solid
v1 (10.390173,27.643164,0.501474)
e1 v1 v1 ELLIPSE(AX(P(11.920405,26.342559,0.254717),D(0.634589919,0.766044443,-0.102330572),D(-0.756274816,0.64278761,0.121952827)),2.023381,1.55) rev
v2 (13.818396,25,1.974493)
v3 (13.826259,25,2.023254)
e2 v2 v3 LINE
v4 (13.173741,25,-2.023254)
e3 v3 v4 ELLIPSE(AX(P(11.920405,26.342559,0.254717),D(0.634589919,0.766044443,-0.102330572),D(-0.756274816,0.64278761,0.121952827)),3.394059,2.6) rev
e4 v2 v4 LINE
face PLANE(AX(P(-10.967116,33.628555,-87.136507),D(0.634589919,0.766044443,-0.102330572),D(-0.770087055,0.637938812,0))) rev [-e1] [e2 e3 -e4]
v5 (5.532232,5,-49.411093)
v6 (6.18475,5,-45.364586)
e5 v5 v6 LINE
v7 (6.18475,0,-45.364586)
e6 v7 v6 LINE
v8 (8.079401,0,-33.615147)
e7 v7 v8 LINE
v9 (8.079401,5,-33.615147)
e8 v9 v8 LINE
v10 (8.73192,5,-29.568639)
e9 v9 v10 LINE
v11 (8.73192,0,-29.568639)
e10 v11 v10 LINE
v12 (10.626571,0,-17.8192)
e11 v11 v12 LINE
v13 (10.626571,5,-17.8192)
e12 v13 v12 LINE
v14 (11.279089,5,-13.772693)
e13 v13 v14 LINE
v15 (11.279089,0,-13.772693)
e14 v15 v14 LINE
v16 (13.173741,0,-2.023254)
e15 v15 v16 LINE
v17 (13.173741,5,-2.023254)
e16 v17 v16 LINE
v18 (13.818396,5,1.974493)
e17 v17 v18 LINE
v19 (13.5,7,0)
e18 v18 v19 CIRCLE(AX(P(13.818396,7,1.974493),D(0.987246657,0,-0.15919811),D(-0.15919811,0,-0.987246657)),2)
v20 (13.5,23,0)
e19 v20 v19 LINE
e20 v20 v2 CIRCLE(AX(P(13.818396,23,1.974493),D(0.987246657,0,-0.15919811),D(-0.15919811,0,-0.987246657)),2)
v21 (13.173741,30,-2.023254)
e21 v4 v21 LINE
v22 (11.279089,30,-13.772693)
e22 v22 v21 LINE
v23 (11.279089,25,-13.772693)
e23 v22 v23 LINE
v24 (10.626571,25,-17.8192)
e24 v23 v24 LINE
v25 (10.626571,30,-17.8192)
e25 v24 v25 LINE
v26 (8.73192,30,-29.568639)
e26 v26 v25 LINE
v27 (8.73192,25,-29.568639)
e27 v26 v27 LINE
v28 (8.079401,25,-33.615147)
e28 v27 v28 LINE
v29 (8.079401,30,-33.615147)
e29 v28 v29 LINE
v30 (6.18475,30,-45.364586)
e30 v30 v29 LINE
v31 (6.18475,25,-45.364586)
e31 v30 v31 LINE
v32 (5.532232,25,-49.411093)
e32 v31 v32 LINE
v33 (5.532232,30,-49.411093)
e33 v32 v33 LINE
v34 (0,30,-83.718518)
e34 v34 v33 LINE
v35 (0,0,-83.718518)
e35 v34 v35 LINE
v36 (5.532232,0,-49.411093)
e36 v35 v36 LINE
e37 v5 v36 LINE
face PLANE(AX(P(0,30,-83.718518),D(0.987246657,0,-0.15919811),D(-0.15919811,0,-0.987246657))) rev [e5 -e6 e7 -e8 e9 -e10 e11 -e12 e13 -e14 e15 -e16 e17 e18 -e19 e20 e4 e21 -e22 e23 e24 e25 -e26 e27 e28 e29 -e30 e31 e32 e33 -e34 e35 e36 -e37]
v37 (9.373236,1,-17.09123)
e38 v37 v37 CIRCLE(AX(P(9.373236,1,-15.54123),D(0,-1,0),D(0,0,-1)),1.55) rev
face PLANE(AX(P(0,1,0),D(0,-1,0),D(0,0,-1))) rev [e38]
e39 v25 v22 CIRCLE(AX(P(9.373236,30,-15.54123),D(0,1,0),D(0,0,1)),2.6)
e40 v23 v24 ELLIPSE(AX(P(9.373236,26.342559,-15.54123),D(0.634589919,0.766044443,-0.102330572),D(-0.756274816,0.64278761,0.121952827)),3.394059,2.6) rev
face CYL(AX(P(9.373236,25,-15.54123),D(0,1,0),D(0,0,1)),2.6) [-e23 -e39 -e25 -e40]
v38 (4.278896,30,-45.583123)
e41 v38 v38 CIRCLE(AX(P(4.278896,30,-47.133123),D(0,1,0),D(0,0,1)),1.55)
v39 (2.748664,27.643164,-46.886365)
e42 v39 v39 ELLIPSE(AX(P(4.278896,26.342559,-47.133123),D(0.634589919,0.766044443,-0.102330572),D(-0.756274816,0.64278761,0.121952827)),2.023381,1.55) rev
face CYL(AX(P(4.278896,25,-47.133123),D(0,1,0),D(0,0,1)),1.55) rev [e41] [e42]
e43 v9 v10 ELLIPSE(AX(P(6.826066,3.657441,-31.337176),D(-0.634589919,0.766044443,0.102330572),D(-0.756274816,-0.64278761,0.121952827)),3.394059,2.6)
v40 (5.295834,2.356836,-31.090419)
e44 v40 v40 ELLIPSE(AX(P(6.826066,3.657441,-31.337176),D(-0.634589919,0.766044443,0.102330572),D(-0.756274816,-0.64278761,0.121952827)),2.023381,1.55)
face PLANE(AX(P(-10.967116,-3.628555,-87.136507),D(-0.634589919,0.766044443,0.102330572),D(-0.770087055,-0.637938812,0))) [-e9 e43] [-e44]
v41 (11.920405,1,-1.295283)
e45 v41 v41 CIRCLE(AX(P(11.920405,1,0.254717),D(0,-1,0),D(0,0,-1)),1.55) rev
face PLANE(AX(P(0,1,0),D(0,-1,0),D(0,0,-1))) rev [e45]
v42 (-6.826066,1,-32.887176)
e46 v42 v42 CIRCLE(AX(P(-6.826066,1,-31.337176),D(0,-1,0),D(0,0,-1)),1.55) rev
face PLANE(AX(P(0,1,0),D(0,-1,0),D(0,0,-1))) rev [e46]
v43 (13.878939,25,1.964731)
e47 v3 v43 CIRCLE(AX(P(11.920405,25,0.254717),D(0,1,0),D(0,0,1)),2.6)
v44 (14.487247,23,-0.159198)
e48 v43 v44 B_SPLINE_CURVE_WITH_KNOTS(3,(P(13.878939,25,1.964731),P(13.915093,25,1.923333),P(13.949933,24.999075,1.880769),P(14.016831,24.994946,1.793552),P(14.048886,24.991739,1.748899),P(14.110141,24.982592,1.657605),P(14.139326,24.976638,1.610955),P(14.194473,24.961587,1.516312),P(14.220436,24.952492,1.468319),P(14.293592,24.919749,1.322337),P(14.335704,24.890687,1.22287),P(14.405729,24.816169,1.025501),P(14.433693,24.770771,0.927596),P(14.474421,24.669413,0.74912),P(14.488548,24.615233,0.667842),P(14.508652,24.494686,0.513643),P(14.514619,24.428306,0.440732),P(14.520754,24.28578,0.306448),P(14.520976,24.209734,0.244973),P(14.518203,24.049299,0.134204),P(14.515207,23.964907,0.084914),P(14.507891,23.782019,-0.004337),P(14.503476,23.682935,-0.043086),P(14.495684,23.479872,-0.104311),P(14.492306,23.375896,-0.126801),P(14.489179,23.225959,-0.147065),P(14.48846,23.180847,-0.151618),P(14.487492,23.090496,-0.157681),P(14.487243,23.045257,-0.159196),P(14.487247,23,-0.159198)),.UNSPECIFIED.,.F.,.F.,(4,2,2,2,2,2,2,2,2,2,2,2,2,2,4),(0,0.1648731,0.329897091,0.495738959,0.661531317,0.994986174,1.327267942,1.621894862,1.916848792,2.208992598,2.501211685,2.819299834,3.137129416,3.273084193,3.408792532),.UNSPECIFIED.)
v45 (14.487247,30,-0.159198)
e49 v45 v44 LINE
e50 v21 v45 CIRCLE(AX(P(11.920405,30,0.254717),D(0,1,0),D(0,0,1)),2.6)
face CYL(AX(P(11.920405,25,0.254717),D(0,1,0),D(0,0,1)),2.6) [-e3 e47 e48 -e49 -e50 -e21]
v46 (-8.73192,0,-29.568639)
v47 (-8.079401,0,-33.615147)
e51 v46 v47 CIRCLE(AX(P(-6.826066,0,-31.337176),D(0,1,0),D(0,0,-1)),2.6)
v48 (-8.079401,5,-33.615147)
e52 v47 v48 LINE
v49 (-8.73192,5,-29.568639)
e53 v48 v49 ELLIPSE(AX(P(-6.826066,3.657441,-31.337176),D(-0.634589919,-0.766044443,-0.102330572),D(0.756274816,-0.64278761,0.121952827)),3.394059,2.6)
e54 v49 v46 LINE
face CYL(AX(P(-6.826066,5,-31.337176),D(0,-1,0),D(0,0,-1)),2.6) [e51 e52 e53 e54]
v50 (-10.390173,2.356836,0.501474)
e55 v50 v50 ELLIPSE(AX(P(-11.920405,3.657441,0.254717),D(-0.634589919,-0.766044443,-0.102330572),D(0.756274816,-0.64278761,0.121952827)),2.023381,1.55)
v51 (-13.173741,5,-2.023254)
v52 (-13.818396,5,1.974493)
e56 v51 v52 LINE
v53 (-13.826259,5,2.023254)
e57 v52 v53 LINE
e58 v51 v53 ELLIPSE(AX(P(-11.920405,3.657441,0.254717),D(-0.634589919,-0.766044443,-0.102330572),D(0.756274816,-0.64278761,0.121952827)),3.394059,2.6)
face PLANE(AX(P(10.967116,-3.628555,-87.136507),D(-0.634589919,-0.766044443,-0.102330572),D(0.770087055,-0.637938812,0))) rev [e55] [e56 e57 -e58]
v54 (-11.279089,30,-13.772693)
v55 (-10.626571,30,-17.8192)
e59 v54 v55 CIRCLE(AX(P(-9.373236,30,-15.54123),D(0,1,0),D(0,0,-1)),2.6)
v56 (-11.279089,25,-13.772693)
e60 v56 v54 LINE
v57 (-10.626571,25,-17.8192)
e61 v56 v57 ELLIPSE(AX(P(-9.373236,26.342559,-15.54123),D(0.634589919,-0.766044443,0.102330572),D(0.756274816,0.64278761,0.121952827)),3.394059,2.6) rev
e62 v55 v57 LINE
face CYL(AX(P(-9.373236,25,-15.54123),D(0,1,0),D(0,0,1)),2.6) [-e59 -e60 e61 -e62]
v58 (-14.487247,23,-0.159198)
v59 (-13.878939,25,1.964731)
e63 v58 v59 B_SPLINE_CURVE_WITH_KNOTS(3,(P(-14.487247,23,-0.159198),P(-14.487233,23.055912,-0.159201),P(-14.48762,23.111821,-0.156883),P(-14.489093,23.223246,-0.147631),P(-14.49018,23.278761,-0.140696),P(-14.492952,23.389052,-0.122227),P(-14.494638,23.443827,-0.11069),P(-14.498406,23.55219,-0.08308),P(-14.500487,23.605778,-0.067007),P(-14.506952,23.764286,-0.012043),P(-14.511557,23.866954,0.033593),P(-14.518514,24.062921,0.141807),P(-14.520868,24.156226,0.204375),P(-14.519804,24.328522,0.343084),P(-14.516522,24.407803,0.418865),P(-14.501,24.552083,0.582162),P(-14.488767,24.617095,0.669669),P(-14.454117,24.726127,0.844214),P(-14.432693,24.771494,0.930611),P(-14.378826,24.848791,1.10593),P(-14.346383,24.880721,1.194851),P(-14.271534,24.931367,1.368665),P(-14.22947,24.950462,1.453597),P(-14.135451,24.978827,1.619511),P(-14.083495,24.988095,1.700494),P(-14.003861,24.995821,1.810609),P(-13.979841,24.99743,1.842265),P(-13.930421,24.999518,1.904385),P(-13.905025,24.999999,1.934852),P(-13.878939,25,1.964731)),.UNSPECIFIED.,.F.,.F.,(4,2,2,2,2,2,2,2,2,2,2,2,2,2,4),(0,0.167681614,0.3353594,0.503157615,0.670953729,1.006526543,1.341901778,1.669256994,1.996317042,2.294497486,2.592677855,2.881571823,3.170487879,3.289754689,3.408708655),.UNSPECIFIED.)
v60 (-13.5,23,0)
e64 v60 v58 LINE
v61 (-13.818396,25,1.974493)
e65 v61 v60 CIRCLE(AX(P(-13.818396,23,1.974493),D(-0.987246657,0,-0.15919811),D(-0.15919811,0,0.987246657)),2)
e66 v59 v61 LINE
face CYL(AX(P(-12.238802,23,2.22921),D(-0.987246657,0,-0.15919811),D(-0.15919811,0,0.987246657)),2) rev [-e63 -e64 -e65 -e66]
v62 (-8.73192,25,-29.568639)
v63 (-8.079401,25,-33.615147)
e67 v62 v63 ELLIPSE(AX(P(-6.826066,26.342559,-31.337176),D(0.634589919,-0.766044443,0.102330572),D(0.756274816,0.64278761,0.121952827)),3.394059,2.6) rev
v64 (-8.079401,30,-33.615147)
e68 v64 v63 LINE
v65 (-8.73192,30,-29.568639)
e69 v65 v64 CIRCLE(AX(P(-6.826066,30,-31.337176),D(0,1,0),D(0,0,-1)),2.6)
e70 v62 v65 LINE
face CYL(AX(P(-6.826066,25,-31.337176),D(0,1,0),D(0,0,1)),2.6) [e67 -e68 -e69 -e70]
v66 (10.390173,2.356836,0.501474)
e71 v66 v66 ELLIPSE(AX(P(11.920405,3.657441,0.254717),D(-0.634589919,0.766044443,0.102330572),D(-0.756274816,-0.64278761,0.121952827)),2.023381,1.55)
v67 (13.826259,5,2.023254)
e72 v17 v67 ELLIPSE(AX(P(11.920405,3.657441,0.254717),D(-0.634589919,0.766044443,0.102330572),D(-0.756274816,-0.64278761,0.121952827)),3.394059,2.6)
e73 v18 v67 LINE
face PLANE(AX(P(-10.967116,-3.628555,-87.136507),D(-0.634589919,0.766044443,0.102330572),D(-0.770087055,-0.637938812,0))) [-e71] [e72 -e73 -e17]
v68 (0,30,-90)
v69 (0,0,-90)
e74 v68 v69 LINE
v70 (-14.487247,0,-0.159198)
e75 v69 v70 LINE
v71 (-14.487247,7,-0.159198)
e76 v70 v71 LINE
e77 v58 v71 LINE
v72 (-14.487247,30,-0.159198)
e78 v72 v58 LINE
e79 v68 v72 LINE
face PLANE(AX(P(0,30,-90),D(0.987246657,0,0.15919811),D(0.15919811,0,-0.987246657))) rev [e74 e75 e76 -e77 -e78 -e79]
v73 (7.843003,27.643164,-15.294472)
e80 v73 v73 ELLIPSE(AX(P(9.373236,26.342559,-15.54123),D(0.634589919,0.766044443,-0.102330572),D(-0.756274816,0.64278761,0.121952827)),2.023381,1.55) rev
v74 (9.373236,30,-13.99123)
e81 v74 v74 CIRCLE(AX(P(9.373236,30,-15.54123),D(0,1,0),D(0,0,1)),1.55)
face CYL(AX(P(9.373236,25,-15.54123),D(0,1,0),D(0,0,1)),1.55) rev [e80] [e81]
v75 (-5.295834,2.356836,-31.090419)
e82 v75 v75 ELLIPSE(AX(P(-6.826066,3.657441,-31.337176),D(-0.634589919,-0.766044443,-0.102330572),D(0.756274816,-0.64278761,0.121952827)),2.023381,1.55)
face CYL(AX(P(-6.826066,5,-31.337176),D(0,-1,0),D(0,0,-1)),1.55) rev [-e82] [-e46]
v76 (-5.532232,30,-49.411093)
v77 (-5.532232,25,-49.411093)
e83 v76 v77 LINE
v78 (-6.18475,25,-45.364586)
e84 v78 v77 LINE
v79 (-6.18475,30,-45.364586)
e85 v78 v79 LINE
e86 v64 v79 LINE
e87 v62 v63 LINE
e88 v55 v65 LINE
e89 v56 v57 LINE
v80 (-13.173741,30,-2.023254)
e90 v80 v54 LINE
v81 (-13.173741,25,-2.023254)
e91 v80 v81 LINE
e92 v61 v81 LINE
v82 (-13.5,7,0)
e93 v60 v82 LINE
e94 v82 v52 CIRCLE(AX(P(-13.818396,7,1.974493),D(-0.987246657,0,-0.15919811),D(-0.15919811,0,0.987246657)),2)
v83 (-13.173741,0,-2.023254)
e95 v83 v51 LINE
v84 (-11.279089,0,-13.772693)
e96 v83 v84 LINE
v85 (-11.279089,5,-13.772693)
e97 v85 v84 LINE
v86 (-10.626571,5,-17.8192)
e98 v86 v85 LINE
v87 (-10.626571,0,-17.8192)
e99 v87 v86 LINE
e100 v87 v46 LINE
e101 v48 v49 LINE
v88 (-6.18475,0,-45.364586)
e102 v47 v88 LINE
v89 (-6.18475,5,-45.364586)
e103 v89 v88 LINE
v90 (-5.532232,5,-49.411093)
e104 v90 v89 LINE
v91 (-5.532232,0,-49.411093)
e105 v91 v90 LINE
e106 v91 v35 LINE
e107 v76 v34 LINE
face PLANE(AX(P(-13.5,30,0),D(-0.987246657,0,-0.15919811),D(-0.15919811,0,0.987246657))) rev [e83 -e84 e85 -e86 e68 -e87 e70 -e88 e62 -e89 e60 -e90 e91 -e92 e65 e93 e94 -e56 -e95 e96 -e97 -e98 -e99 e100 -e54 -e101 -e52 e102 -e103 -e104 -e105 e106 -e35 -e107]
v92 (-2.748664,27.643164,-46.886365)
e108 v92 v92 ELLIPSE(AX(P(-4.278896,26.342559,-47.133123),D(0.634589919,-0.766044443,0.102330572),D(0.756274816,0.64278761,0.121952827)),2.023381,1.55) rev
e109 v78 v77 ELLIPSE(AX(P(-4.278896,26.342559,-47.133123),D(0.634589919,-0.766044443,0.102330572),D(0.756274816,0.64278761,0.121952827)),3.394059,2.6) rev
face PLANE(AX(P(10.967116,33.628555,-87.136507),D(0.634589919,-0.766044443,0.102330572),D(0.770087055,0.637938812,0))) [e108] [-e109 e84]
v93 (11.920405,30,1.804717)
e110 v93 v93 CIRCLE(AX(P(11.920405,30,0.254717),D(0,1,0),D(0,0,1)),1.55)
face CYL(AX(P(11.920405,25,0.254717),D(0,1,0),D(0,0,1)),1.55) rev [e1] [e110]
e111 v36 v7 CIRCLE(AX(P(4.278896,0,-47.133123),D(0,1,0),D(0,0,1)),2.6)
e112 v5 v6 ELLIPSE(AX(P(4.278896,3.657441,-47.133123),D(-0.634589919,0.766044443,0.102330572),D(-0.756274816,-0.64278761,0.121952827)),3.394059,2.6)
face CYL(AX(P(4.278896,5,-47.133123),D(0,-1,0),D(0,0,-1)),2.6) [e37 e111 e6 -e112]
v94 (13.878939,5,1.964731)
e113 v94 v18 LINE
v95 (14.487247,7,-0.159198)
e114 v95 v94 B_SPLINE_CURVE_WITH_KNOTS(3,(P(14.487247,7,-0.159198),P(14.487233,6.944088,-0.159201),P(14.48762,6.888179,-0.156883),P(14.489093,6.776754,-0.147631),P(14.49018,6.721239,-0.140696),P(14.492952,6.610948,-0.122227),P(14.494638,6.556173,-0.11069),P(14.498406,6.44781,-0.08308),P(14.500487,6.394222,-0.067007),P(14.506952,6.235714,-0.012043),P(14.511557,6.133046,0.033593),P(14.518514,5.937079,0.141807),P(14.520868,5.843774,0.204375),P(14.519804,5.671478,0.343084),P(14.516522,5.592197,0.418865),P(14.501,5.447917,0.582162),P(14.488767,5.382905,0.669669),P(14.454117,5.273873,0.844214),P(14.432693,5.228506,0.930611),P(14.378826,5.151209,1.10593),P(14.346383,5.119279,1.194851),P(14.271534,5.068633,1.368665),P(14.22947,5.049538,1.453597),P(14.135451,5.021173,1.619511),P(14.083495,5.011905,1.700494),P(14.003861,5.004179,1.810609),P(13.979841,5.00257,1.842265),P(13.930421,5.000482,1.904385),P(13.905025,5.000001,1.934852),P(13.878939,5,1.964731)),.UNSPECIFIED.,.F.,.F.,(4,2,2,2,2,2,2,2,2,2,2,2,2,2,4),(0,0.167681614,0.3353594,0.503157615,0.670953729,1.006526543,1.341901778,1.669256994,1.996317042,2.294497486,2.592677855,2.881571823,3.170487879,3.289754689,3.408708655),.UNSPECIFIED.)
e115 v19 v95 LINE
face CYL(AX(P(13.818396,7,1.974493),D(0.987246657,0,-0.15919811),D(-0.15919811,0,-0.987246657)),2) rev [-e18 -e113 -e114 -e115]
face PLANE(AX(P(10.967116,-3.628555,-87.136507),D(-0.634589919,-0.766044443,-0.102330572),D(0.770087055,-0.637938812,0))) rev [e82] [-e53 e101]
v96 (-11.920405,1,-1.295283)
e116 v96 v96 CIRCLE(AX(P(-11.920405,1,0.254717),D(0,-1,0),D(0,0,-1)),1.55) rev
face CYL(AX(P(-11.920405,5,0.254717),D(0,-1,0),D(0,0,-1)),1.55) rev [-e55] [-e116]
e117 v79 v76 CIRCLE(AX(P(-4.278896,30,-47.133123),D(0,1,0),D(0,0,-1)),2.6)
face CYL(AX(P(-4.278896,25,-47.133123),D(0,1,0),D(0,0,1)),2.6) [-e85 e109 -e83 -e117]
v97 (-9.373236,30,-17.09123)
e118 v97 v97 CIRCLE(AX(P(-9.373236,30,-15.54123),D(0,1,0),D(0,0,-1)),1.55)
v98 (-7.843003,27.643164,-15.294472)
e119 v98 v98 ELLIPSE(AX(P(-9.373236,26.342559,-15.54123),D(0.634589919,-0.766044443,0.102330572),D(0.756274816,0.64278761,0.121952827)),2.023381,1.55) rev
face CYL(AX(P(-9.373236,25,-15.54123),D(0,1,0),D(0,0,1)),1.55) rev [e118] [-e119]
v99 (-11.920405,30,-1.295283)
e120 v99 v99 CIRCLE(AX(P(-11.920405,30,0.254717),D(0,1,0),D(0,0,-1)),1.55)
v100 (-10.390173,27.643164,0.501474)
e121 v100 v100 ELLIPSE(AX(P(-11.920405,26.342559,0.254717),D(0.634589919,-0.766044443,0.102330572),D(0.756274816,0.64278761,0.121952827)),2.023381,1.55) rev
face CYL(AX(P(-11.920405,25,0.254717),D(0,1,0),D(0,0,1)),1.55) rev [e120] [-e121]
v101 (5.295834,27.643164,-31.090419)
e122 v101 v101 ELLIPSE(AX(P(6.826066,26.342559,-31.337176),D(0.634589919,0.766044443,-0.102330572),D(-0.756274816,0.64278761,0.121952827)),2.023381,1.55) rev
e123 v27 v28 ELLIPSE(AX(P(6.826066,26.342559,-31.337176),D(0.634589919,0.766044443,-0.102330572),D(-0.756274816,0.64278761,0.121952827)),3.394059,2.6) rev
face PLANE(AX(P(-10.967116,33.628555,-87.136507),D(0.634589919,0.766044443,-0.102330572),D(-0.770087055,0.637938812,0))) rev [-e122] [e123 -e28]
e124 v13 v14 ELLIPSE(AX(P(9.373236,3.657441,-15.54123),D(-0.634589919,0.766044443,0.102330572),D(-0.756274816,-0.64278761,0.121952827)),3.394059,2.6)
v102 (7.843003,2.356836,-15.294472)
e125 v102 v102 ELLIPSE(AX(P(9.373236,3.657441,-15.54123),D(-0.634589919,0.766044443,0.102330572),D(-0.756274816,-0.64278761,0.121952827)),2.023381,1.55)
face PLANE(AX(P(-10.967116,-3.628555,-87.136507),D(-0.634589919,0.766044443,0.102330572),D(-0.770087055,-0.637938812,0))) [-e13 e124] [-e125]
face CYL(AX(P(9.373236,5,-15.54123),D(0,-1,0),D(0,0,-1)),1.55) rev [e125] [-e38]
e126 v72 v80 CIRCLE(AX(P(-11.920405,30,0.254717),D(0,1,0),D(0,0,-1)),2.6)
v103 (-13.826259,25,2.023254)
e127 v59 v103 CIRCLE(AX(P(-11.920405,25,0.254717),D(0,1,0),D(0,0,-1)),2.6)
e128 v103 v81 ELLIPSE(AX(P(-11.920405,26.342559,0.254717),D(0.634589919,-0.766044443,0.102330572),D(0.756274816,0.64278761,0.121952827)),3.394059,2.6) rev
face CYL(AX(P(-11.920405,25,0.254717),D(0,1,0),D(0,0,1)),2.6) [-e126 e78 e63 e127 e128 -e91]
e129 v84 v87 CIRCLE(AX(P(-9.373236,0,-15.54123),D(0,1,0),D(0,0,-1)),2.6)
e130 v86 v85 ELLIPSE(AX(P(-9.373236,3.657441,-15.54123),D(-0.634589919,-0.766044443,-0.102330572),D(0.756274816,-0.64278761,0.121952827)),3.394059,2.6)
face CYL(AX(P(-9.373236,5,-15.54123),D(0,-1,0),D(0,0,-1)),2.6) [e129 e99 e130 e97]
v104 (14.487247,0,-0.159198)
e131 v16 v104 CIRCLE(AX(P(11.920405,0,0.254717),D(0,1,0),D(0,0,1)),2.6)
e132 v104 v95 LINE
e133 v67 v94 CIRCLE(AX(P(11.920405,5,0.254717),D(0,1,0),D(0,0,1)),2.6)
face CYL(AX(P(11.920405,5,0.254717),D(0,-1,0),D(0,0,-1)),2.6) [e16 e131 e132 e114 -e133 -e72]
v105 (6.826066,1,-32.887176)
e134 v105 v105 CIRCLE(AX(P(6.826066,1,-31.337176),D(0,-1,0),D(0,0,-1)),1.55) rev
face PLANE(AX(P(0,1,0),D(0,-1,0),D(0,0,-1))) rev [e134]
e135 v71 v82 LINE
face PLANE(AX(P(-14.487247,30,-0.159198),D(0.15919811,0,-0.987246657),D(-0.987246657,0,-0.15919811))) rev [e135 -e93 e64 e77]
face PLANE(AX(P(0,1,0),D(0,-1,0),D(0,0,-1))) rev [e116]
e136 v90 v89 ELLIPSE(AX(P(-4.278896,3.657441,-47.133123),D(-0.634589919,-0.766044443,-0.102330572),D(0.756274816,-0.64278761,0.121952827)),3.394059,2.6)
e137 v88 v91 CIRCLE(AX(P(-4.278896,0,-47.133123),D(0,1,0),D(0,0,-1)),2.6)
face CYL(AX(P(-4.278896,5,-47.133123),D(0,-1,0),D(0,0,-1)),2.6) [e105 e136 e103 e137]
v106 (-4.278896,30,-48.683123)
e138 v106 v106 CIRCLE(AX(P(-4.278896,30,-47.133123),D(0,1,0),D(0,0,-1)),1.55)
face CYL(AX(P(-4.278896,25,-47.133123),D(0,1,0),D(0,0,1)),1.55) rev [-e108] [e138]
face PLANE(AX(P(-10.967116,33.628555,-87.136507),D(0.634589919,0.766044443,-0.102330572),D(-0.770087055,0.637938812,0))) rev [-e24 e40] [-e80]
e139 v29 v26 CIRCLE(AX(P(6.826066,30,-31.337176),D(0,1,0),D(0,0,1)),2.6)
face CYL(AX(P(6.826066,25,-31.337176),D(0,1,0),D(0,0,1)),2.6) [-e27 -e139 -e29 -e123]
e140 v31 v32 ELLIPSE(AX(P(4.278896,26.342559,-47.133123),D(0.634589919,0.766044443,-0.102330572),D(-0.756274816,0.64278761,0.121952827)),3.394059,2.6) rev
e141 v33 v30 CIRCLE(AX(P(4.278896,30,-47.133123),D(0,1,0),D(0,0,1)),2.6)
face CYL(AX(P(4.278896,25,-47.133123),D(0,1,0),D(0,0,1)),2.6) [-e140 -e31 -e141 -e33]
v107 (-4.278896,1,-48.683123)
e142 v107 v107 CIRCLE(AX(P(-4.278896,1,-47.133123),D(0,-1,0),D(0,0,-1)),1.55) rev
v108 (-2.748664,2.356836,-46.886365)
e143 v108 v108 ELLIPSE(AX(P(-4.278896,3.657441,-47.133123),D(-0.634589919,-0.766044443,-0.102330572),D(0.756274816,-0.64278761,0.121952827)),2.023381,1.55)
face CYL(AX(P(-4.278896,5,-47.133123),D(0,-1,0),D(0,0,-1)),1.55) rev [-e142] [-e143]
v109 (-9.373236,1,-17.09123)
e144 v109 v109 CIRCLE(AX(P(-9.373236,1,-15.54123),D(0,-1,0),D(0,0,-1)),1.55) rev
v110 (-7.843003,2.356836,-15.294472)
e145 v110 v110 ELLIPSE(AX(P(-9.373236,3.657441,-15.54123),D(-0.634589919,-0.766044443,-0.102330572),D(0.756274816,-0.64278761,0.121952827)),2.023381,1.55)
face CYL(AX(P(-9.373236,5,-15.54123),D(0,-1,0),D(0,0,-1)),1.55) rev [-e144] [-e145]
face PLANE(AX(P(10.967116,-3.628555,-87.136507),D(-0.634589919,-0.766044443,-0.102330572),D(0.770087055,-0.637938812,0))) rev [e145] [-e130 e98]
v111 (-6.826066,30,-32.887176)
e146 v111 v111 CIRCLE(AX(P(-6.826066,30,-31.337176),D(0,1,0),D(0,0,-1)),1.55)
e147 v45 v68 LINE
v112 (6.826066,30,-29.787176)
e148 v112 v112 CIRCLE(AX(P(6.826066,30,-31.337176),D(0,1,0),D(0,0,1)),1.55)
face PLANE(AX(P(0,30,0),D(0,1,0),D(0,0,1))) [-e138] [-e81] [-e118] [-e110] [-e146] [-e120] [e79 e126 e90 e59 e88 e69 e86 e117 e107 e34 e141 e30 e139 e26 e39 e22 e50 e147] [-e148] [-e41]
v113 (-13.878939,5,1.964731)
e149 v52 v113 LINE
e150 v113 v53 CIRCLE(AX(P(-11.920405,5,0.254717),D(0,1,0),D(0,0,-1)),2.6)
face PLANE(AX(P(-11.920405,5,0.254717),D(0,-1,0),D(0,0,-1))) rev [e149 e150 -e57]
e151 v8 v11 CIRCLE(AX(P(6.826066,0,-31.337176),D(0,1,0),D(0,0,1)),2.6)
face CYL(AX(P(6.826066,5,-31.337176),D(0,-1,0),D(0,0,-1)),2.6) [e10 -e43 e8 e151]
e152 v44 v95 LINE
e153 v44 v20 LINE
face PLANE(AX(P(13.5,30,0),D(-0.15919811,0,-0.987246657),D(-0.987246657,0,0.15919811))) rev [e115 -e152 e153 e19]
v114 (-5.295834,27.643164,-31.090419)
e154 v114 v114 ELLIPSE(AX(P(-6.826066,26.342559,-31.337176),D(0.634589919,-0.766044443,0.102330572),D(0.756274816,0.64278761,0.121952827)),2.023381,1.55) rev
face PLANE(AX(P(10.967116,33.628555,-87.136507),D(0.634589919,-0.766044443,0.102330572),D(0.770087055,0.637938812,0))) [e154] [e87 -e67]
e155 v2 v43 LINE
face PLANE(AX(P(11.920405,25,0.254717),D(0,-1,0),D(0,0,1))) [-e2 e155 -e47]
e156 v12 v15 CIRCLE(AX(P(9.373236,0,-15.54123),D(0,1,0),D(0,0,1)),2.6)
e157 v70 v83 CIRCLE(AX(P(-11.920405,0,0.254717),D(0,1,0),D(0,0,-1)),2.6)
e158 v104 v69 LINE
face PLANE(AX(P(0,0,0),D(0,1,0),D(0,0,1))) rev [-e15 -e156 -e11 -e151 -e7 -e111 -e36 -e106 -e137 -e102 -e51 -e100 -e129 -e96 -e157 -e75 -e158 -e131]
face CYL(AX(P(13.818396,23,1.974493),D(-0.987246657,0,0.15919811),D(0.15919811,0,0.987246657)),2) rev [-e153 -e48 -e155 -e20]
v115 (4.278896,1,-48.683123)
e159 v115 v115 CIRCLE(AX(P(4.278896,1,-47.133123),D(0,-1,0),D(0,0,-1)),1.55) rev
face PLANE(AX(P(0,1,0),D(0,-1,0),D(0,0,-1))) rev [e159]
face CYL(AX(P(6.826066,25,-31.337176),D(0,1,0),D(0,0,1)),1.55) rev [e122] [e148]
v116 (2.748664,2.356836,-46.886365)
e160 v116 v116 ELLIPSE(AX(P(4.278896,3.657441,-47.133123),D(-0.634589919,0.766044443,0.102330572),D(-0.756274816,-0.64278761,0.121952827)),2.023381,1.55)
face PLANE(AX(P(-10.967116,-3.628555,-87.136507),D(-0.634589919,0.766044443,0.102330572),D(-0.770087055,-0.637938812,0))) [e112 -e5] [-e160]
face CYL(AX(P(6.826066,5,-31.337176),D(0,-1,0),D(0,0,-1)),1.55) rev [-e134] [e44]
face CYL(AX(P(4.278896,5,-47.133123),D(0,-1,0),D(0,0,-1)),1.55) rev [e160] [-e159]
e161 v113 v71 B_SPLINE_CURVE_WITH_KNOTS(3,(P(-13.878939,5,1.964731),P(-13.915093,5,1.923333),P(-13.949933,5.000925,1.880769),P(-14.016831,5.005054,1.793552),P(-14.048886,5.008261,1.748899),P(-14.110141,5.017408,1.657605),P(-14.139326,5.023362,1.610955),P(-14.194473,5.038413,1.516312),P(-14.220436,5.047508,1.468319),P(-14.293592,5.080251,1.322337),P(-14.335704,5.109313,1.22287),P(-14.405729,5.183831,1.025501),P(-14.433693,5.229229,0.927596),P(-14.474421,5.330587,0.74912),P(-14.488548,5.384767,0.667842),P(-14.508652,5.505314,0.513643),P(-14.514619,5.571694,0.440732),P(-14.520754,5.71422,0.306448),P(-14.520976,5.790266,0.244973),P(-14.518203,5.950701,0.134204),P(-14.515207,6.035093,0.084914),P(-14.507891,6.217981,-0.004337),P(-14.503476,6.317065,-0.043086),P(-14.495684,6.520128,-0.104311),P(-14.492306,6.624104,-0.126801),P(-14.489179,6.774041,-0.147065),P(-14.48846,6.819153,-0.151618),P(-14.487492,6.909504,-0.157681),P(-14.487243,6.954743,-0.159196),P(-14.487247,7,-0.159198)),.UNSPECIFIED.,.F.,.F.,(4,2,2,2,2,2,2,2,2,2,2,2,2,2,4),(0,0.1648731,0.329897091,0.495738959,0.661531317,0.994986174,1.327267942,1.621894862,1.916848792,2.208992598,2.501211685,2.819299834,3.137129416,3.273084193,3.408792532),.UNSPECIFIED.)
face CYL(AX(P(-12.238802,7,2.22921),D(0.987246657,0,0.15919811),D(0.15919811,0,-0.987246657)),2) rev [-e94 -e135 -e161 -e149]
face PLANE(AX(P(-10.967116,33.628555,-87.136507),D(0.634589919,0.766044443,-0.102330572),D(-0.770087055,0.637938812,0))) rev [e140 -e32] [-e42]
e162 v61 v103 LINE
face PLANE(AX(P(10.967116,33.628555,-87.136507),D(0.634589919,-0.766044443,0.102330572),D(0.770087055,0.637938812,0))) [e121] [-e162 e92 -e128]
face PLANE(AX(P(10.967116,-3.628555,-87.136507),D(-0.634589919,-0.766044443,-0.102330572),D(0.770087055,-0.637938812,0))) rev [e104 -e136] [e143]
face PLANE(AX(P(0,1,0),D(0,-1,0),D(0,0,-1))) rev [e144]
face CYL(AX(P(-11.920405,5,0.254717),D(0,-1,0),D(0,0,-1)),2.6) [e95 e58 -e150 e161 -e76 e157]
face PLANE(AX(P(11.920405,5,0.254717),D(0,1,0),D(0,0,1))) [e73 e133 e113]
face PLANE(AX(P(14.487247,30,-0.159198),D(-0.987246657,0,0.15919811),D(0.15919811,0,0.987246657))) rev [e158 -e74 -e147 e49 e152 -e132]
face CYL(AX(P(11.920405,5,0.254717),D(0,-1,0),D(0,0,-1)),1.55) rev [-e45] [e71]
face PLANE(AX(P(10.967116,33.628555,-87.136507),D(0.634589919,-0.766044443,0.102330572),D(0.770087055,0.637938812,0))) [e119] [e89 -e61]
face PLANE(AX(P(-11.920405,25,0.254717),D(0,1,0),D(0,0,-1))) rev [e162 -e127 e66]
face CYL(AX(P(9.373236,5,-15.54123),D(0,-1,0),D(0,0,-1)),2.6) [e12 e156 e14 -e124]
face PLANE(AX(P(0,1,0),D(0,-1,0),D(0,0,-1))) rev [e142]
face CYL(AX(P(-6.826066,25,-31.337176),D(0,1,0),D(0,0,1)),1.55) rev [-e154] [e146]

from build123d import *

# Parameters (mm, degrees)
BOSS_EXTRUDE1_DEPTH            = 30
SKETCH2_R                      = 2.6
SKETCH2_R_2                    = 1.55
BOSS_EXTRUDE3_DEPTH            = 5
CUT_EXTRUDE1_REACH             = 100.017
CUT_EXTRUDE1_DIRECTION_2_DEPTH = 99.016911981
CUT_EXTRUDE2_REACH             = 100.017
CUT_EXTRUDE2_DIRECTION_2_DEPTH = 99.016911981
FILLET1_R                      = 2
SKETCH6_R                      = 2.6
BOSS_EXTRUDE4_DEPTH            = 1


with BuildPart() as part:
    # Sketch1 → Boss-Extrude1 (new body)
    with BuildSketch(Plane(origin=(0, 0, 0), x_dir=(1, 0, 0), z_dir=(0, 1, 0))):
        Polygon((-13.5, 0), (0, 83.718518379), (13.5, 0), (14.487246657, 0.15919811), (0, 90), (-14.487246657, 0.15919811), align=None)
    extrude(amount=BOSS_EXTRUDE1_DEPTH)

    # Sketch2 → Boss-Extrude3 (add)
    # profile 1 of 8: a face of its own
    with BuildSketch(Plane(origin=(0, 0, 0), x_dir=(1, 0, 0), z_dir=(0, 1, 0))):
        with Locations((11.920405349, -0.254716975)):
            Circle(SKETCH2_R)
        with Locations(Location((11.920405349, -0.254716975, 0), (0, 0, 270))):
            Circle(SKETCH2_R_2, mode=Mode.SUBTRACT)
    # profile 2 of 8: a face of its own
    with BuildSketch(Plane(origin=(0, 0, 0), x_dir=(1, 0, 0), z_dir=(0, 1, 0))):
        with Locations((9.373235594, 15.541229537)):
            Circle(SKETCH2_R)
        with Locations(Location((9.373235594, 15.541229537, 0), (0, 0, 270))):
            Circle(SKETCH2_R_2, mode=Mode.SUBTRACT)
    # profile 3 of 8: a face of its own
    with BuildSketch(Plane(origin=(0, 0, 0), x_dir=(1, 0, 0), z_dir=(0, 1, 0))):
        with Locations((6.826065839, 31.33717605)):
            Circle(SKETCH2_R)
        with Locations(Location((6.826065839, 31.33717605, 0), (0, 0, 270))):
            Circle(SKETCH2_R_2, mode=Mode.SUBTRACT)
    # profile 4 of 8: a face of its own
    with BuildSketch(Plane(origin=(0, 0, 0), x_dir=(1, 0, 0), z_dir=(0, 1, 0))):
        with Locations((4.278896085, 47.133122563)):
            Circle(SKETCH2_R)
        with Locations(Location((4.278896085, 47.133122563, 0), (0, 0, 270))):
            Circle(SKETCH2_R_2, mode=Mode.SUBTRACT)
    # profile 5 of 8: a face of its own
    with BuildSketch(Plane(origin=(0, 0, 0), x_dir=(1, 0, 0), z_dir=(0, 1, 0))):
        with Locations((-4.278896085, 47.133122563)):
            Circle(SKETCH2_R)
        with Locations(Location((-4.278896085, 47.133122563, 0), (0, 0, 90))):
            Circle(SKETCH2_R_2, mode=Mode.SUBTRACT)
    # profile 6 of 8: a face of its own
    with BuildSketch(Plane(origin=(0, 0, 0), x_dir=(1, 0, 0), z_dir=(0, 1, 0))):
        with Locations((-6.826065839, 31.33717605)):
            Circle(SKETCH2_R)
        with Locations(Location((-6.826065839, 31.33717605, 0), (0, 0, 90))):
            Circle(SKETCH2_R_2, mode=Mode.SUBTRACT)
    # profile 7 of 8: a face of its own
    with BuildSketch(Plane(origin=(0, 0, 0), x_dir=(1, 0, 0), z_dir=(0, 1, 0))):
        with Locations((-9.373235594, 15.541229537)):
            Circle(SKETCH2_R)
        with Locations(Location((-9.373235594, 15.541229537, 0), (0, 0, 90))):
            Circle(SKETCH2_R_2, mode=Mode.SUBTRACT)
    # profile 8 of 8: a face of its own
    with BuildSketch(Plane(origin=(0, 0, 0), x_dir=(1, 0, 0), z_dir=(0, 1, 0))):
        with Locations((-11.920405349, -0.254716975)):
            Circle(SKETCH2_R)
        with Locations(Location((-11.920405349, -0.254716975, 0), (0, 0, 90))):
            Circle(SKETCH2_R_2, mode=Mode.SUBTRACT)
    boss_extrude3 = extrude(amount=BOSS_EXTRUDE3_DEPTH)

    # Cut-Extrude1: up to this face of the body (flat: up to its plane)
    cut_extrude1_end = Plane(part.part.faces().sort_by_distance((-6.68152525, 15.362665762, -42.28389657))[0])
    # Sketch4 → Cut-Extrude1 (cut, up to the picked face)
    with BuildSketch(Plane(origin=(0.342144515, 0, 2.121765321), x_dir=(0.9872466570606503, 0, -0.1591981096702188), z_dir=(0.1591981096702188, 0, 0.9872466570606503)), mode=Mode.PRIVATE) as cut_extrude1_sk1:
        Polygon((13.32782987, 5), (9.12782987, 5), (9.12782987, 1.475781549), align=None)
    cut_extrude1_tool1 = split(extrude(cut_extrude1_sk1.sketch, amount=-CUT_EXTRUDE1_REACH, mode=Mode.PRIVATE), bisect_by=cut_extrude1_end, keep=Keep.BOTH, mode=Mode.PRIVATE)
    cut_extrude1 = cut_extrude1_tool1.solids().sort_by(Axis((10.735709, 3.825261, 0.445755), (-0.1591981096702188, 0, -0.9872466570606503)))[0]
    add(cut_extrude1, mode=Mode.SUBTRACT)

    # Sketch4 → Cut-Extrude1 direction 2 (cut)
    with BuildSketch(Plane(origin=(0.342144515, 0, 2.121765321), x_dir=(0.9872466570606503, 0, -0.1591981096702188), z_dir=(0.1591981096702188, 0, 0.9872466570606503))):
        Polygon((13.32782987, 5), (9.12782987, 5), (9.12782987, 1.475781549), align=None)
    cut_extrude1_direction_2 = extrude(amount=CUT_EXTRUDE1_DIRECTION_2_DEPTH, mode=Mode.SUBTRACT)

    # Cut-Extrude2: up to this face of the body (flat: up to its plane)
    cut_extrude2_end = Plane(part.part.faces().sort_by_distance((6.68152525, 15.362665762, -42.28389657))[0])
    # Sketch5 → Cut-Extrude2 (cut, up to the picked face)
    with BuildSketch(Plane(origin=(-0.342144515, 0, 2.121765321), x_dir=(0.9872466570606502, 0, 0.15919810967021986), z_dir=(-0.15919810967021986, 0, 0.9872466570606502)), mode=Mode.PRIVATE) as cut_extrude2_sk1:
        Polygon((-9.12782987, 5), (-9.12782987, 1.475781549), (-13.32782987, 5), align=None)
    cut_extrude2_tool1 = split(extrude(cut_extrude2_sk1.sketch, amount=-CUT_EXTRUDE2_REACH, mode=Mode.PRIVATE), bisect_by=cut_extrude2_end, keep=Keep.BOTH, mode=Mode.PRIVATE)
    cut_extrude2 = cut_extrude2_tool1.solids().sort_by(Axis((-10.735709, 3.825261, 0.445755), (0.15919810967021986, 0, -0.9872466570606502)))[0]
    add(cut_extrude2, mode=Mode.SUBTRACT)

    # Sketch5 → Cut-Extrude2 direction 2 (cut)
    with BuildSketch(Plane(origin=(-0.342144515, 0, 2.121765321), x_dir=(0.9872466570606502, 0, 0.15919810967021986), z_dir=(-0.15919810967021986, 0, 0.9872466570606502))):
        Polygon((-9.12782987, 5), (-9.12782987, 1.475781549), (-13.32782987, 5), align=None)
    cut_extrude2_direction_2 = extrude(amount=CUT_EXTRUDE2_DIRECTION_2_DEPTH, mode=Mode.SUBTRACT)

    # Mirror2: Boss-Extrude3, Cut-Extrude1, Cut-Extrude1 direction 2, Cut-Extrude2, Cut-Extrude2 direction 2 across plane
    add(boss_extrude3.mirror(Plane.ZX.offset(15)))
    add(cut_extrude1.mirror(Plane.ZX.offset(15)), mode=Mode.SUBTRACT)
    add(cut_extrude1_direction_2.mirror(Plane.ZX.offset(15)), mode=Mode.SUBTRACT)
    add(cut_extrude2.mirror(Plane.ZX.offset(15)), mode=Mode.SUBTRACT)
    add(cut_extrude2_direction_2.mirror(Plane.ZX.offset(15)), mode=Mode.SUBTRACT)

    # Fillet1
    # the kernel refuses this fillet: 2 mm, written as the material it adds along each edge
    with BuildSketch(Plane(origin=(-19.423479942, 5, -0.955188658), x_dir=(-0.15919810967021975, 0, 0.9872466570606501), z_dir=(0.9872466570606501, 0, 0.15919810967021975))) as fillet1_piece_1_section:
        with BuildLine():
            CenterArc((FILLET1_R, -FILLET1_R), FILLET1_R, 90, 90)
            Line((0, -FILLET1_R), (0, 0))
            Line((0, 0), (FILLET1_R, 0))
        make_face()
    fillet1_piece_1 = extrude(amount=6, mode=Mode.PRIVATE)
    fillet1_piece_1 = fillet1_piece_1 & Plane(origin=(-11.920405349, 5.222362792, 0.254716975), x_dir=(1, 0, 0), z_dir=(0, -1, 0)) * Cylinder(2.6, 21, mode=Mode.PRIVATE)
    add(fillet1_piece_1)
    with BuildSketch(Plane(origin=(13.5, 5, 0), x_dir=(0, 1, 0), z_dir=(0.9872466570606502, 0, -0.15919810967021866))) as fillet1_piece_2_section:
        with BuildLine():
            CenterArc((FILLET1_R, FILLET1_R), FILLET1_R, 180, 90)
            Line((0, FILLET1_R), (0, 0))
            Line((0, 0), (FILLET1_R, 0))
        make_face()
    fillet1_piece_2 = extrude(amount=6, mode=Mode.PRIVATE)
    fillet1_piece_2 = fillet1_piece_2 & Plane(origin=(11.920405349, 5.699977741, 0.254716975), x_dir=(1, 0, 0), z_dir=(0, -1, 0)) * Cylinder(2.6, 20, mode=Mode.PRIVATE)
    add(fillet1_piece_2)
    with BuildSketch(Plane(origin=(13.5, 25, 0), x_dir=(0, -1, 0), z_dir=(0.9872466570606502, 0, -0.15919810967021866))) as fillet1_piece_3_section:
        with BuildLine():
            CenterArc((FILLET1_R, -FILLET1_R), FILLET1_R, 90, 90)
            Line((0, -FILLET1_R), (0, 0))
            Line((0, 0), (FILLET1_R, 0))
        make_face()
    fillet1_piece_3 = extrude(amount=6, mode=Mode.PRIVATE)
    fillet1_piece_3 = fillet1_piece_3 & Plane(origin=(11.920405349, 24.300022259, 0.254716975), x_dir=(1, 0, 0), z_dir=(0, 1, 0)) * Cylinder(2.6, 20, mode=Mode.PRIVATE)
    add(fillet1_piece_3)
    with BuildSketch(Plane(origin=(-19.423479942, 25, -0.955188658), x_dir=(0, -1, 0), z_dir=(0.9872466570606501, 0, 0.15919810967021975))) as fillet1_piece_4_section:
        with BuildLine():
            CenterArc((FILLET1_R, -FILLET1_R), FILLET1_R, 90, 90)
            Line((0, -FILLET1_R), (0, 0))
            Line((0, 0), (FILLET1_R, 0))
        make_face()
    fillet1_piece_4 = extrude(amount=6, mode=Mode.PRIVATE)
    fillet1_piece_4 = fillet1_piece_4 & Plane(origin=(-11.920405349, 24.777637105, 0.254716975), x_dir=(1, 0, 0), z_dir=(0, 1, 0)) * Cylinder(2.6, 21, mode=Mode.PRIVATE)
    add(fillet1_piece_4)

    # Sketch6 → Boss-Extrude4 (add)
    with BuildSketch(Plane.XZ):
        with Locations((11.920405349, 0.254716975)):
            Circle(SKETCH6_R)
        with Locations((9.373235594, -15.541229537)):
            Circle(SKETCH6_R)
        with Locations((6.826065839, -31.33717605)):
            Circle(SKETCH6_R)
        with Locations((4.278896085, -47.133122563)):
            Circle(SKETCH6_R)
        with Locations((-4.278896085, -47.133122563)):
            Circle(SKETCH6_R)
        with Locations((-6.826065839, -31.33717605)):
            Circle(SKETCH6_R)
        with Locations((-9.373235594, -15.541229537)):
            Circle(SKETCH6_R)
        with Locations((-11.920405349, 0.254716975)):
            Circle(SKETCH6_R)
    extrude(amount=-BOSS_EXTRUDE4_DEPTH)


solid = part.part
